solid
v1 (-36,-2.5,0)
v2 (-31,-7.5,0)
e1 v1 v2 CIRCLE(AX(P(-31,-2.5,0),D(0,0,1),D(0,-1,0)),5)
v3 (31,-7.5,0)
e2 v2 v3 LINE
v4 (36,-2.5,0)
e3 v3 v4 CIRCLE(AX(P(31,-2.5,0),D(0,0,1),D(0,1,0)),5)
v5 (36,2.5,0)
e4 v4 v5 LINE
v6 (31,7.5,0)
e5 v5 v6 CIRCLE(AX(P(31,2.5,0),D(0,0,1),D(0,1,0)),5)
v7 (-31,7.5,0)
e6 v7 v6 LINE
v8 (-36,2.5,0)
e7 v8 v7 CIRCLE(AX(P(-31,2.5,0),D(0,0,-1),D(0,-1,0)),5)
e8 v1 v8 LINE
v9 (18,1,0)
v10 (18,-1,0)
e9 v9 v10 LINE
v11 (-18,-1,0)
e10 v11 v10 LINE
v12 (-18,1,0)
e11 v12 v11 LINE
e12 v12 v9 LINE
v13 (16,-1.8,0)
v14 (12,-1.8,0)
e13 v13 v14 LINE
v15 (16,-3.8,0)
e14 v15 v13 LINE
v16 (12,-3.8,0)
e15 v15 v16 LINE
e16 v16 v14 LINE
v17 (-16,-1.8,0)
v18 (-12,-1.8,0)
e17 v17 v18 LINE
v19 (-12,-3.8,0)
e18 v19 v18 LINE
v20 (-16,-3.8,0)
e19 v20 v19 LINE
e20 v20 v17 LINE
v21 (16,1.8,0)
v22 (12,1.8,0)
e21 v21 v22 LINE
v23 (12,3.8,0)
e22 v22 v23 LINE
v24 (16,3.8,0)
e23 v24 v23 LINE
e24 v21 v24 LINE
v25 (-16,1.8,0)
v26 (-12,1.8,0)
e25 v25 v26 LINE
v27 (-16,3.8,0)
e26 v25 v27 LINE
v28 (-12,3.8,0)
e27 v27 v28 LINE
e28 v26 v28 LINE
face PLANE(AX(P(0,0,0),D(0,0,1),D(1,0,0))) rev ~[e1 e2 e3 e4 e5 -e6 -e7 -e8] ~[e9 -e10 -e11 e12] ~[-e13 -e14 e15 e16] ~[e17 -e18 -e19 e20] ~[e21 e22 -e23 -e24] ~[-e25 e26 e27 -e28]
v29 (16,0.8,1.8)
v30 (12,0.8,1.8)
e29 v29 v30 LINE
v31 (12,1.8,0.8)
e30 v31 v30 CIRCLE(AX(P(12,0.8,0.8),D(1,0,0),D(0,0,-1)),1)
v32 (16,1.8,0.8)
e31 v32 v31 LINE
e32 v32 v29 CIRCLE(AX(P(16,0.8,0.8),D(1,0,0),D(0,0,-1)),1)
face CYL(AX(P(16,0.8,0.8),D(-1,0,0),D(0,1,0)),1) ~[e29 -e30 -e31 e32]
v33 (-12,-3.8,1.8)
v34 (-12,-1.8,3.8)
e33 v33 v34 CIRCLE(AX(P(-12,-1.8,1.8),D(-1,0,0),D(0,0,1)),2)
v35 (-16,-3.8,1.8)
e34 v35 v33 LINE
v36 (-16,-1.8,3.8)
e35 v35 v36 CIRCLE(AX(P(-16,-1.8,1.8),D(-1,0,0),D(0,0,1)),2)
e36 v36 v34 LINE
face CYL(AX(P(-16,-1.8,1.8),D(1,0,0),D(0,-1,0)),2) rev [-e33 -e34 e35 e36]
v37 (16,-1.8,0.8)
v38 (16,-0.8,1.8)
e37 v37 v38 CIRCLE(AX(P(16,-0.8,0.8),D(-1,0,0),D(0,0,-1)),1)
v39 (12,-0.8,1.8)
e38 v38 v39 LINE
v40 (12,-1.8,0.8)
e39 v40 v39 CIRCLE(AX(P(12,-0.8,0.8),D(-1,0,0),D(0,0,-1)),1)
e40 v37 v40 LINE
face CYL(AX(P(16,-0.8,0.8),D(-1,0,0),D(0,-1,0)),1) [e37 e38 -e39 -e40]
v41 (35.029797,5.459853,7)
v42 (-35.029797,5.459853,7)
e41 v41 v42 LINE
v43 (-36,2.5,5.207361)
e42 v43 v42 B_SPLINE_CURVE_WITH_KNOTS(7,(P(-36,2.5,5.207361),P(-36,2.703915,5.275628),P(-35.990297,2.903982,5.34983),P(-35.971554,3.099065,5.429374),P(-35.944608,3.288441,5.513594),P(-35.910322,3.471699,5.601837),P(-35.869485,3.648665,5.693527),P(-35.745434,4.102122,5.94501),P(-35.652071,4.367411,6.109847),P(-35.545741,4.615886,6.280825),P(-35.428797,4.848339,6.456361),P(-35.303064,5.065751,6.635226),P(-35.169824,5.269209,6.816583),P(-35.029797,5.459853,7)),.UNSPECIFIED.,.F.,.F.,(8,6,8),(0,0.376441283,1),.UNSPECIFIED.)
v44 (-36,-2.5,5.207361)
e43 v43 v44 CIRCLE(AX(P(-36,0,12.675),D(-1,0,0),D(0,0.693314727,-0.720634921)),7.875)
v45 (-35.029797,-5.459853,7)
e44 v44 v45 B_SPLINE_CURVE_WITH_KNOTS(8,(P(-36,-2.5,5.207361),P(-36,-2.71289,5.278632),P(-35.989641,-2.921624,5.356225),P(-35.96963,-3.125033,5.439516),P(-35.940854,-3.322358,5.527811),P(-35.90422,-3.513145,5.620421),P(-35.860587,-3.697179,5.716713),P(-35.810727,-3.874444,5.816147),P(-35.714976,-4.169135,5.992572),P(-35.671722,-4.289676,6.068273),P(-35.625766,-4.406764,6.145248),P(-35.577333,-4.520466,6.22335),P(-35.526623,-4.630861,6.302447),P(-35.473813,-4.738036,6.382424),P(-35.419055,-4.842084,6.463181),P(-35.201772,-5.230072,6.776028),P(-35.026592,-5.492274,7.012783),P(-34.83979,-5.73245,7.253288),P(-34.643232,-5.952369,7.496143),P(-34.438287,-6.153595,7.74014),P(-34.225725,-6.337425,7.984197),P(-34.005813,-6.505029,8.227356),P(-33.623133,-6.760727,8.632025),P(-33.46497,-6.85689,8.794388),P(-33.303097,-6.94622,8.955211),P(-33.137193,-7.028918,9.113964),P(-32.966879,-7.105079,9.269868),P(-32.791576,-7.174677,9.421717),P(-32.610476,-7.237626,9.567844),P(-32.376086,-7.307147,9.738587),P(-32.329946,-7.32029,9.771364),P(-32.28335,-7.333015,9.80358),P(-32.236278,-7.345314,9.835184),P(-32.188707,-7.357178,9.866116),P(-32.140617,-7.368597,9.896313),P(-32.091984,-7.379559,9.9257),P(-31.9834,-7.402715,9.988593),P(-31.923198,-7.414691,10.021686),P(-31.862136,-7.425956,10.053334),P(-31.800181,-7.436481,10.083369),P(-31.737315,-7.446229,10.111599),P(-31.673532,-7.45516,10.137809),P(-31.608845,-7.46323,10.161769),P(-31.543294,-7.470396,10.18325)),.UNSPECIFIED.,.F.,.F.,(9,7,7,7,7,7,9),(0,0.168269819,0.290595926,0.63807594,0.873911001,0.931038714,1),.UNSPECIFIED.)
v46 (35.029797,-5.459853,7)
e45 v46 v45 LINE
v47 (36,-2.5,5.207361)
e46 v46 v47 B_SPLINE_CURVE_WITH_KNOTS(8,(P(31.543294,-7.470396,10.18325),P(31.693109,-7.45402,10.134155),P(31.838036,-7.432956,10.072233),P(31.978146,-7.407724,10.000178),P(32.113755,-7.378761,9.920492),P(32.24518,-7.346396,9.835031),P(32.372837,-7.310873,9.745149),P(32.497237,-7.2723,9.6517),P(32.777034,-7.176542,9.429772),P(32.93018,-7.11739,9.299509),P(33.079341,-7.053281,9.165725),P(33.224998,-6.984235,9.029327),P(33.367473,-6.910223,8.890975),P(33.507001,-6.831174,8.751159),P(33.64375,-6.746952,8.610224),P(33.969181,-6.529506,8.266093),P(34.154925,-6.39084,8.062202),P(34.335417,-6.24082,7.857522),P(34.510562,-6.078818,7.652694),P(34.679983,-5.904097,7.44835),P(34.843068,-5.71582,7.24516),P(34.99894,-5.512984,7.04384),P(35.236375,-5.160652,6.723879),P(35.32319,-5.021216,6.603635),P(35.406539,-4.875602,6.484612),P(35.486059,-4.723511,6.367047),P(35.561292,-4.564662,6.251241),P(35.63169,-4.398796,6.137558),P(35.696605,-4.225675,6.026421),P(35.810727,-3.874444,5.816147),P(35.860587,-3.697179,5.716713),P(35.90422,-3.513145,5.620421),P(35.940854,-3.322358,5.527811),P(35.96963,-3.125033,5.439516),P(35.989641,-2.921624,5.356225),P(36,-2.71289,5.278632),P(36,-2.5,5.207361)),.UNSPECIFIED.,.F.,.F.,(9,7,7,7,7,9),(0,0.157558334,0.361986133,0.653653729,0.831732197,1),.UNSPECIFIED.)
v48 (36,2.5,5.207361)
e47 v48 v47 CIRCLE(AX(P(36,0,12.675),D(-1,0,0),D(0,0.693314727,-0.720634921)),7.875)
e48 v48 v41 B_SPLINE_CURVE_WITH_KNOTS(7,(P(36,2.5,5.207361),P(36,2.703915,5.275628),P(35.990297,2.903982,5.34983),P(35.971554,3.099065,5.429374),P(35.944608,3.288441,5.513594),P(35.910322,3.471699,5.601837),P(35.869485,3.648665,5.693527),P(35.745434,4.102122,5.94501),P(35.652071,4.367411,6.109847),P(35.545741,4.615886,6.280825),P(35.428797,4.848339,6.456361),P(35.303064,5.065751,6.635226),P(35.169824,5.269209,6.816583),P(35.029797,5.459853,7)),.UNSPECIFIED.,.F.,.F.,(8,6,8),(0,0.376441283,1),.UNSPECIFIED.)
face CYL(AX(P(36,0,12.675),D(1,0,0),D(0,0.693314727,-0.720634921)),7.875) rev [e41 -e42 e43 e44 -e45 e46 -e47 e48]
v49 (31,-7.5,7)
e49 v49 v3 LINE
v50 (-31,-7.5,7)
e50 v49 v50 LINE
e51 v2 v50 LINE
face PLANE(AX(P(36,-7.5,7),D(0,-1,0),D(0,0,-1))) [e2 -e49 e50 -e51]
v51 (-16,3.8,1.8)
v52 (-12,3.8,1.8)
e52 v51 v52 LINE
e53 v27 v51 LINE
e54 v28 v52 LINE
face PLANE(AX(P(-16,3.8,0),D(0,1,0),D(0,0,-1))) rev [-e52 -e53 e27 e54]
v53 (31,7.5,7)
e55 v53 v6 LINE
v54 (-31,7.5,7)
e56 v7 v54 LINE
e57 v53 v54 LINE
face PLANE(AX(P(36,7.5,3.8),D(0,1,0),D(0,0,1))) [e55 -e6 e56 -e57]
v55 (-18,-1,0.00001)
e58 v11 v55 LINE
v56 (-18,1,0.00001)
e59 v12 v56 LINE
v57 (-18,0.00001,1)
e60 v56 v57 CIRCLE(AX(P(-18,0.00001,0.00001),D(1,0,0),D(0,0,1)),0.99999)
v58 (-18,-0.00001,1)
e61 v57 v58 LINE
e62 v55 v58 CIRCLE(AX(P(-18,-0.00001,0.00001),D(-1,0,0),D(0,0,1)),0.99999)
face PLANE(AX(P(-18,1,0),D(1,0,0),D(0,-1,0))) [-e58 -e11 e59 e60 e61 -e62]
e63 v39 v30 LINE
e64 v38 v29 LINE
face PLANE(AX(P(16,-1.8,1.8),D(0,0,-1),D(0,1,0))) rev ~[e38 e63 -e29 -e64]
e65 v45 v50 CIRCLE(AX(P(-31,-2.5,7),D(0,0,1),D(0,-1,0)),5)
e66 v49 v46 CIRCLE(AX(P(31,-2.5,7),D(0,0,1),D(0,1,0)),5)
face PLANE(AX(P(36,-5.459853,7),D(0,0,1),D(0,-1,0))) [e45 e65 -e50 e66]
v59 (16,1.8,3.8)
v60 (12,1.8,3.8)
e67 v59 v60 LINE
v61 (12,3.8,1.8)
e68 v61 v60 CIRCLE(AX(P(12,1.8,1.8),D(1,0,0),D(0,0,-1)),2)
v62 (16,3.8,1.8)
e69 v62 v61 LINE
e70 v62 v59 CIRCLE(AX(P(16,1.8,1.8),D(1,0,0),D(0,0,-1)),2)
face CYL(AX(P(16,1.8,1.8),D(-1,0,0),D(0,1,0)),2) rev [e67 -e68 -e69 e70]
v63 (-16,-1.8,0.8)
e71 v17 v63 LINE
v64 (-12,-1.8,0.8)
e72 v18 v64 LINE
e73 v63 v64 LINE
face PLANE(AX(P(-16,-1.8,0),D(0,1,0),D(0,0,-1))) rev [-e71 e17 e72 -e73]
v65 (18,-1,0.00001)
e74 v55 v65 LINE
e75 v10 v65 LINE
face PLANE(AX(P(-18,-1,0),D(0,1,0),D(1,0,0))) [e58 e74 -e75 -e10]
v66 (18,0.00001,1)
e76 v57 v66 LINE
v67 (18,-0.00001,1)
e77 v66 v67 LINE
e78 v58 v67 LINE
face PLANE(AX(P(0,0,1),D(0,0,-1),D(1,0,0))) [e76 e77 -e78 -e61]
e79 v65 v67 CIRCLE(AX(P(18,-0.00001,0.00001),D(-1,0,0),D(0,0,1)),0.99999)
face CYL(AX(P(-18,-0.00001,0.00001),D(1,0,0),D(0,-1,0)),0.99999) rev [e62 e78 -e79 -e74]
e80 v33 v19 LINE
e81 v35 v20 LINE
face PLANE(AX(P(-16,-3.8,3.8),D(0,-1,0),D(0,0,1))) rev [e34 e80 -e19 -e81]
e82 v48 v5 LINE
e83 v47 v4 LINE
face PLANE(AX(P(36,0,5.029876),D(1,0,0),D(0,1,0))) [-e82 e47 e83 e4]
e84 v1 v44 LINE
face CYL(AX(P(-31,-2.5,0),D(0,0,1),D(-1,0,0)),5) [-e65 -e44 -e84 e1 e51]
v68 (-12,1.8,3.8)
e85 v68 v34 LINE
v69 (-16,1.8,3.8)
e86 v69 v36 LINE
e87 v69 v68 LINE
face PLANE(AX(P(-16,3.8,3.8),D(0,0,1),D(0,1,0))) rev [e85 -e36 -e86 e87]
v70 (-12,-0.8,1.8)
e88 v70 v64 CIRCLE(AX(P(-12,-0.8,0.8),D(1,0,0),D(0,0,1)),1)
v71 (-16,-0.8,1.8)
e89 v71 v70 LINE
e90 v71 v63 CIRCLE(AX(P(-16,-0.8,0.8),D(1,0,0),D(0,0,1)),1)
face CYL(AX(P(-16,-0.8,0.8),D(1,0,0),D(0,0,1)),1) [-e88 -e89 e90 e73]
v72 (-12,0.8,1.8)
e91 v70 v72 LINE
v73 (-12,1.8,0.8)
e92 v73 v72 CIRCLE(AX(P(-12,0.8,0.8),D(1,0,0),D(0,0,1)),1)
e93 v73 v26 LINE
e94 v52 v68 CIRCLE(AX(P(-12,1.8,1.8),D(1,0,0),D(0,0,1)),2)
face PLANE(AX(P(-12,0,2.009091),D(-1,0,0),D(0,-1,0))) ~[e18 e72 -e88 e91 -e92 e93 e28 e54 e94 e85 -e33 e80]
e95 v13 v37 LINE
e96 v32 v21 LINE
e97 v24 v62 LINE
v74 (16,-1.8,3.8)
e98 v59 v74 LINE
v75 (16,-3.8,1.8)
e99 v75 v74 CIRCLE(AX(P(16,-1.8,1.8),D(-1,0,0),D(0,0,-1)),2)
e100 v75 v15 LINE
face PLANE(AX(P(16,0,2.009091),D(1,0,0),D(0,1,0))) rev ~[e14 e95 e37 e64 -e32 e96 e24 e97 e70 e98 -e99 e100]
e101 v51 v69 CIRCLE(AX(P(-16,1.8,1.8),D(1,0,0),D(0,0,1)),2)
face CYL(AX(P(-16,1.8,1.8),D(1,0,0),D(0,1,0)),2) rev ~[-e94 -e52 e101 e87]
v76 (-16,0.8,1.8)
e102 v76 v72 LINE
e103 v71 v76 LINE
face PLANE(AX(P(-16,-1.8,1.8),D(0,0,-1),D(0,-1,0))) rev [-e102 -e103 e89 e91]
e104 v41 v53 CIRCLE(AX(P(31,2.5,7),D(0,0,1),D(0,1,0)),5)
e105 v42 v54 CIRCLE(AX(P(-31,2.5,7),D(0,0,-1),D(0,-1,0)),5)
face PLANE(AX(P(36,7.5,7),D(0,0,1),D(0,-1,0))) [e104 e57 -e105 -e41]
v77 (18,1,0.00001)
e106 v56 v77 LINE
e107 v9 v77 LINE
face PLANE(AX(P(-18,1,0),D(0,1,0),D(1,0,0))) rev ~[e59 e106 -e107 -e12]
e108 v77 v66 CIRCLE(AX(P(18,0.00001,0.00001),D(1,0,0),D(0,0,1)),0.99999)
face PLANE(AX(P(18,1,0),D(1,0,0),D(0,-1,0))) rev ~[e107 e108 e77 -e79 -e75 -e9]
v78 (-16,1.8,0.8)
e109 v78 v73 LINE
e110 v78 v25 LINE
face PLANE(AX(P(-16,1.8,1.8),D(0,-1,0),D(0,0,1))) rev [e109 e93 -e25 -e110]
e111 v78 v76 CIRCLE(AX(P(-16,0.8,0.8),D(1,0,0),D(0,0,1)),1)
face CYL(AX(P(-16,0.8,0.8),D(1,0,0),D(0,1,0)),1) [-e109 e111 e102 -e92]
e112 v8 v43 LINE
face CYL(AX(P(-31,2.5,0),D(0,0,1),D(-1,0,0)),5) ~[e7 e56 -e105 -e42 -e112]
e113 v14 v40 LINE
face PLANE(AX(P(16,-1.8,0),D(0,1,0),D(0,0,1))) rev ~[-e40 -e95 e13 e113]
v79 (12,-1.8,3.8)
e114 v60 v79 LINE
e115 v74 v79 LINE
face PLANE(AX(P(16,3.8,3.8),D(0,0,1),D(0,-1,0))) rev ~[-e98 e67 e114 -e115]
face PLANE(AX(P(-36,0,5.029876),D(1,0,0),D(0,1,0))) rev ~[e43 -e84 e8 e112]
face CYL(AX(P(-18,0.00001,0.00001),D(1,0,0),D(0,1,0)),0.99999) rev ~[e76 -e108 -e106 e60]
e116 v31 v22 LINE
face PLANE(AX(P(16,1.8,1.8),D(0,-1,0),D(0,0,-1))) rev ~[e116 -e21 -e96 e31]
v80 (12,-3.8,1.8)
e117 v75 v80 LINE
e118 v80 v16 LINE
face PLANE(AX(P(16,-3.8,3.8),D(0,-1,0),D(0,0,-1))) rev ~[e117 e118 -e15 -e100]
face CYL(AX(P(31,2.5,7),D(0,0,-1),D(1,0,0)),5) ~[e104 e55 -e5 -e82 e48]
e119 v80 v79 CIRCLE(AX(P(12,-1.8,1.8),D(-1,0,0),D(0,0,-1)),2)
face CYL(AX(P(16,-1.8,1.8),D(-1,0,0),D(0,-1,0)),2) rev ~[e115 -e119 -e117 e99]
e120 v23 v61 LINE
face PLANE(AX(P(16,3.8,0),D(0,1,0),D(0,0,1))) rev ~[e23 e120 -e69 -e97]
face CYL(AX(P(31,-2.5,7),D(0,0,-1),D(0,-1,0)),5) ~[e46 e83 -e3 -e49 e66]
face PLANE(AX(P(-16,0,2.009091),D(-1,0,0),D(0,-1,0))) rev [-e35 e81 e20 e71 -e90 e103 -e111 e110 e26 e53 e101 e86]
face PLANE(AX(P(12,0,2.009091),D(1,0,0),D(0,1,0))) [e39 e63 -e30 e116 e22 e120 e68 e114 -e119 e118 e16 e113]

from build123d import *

# Parameters (mm, degrees)
F0_W      = 72
F0_H      = 15
F1_DEPTH  = 3.8
F3_DEPTH  = 72
F4_R      = 5
F5_W      = 36
F5_H      = 2
F6_DEPTH  = 1
F7_R      = 0.99999
F10_DEPTH = 4
F11_R     = 2
F12_R     = 1


# Not quite as in the source:
# - a fillet or chamfer is up to 0.001 mm smaller than in the source, because OpenCascade refuses the exact size
# - a pattern or mirror of a feature is missing from the dataset's text; its kind, count and spacing are read off the source's solid


with BuildPart() as f1:
    # F0 (on Top) → F1 (new body)
    with BuildSketch(Plane.XY):
        Rectangle(F0_W, F0_H)
    extrude(amount=F1_DEPTH)

    # F2 (on face) → F3 (join)
    with BuildSketch(Plane.YZ.offset(36)):
        with BuildLine():
            Line((7.5, 7), (5.4598534779, 7))
            ThreePointArc((5.4598534779, 7), (0, 4.8), (-5.4598534779, 7))
            Line((-5.4598534779, 7), (-7.5, 7))
            Line((-7.5, 7), (-7.5, 3.8))
            Line((-7.5, 3.8), (7.5, 3.8))
            Line((7.5, 3.8), (7.5, 7))
        make_face()
    extrude(amount=-F3_DEPTH)

    # F4
    f4_edges = [f1.edges().sort_by_distance(p)[0] for p in [
        (-36, -7.5, 3.5),
        (36, -7.5, 3.5),
        (36, 7.5, 3.5),
        (-36, 7.5, 3.5),
    ]]
    fillet(f4_edges, radius=F4_R)

    # F5 (on face) → F6 (cut)
    with BuildSketch(Plane(origin=(0, 0, 0), x_dir=(1, 0, 0), z_dir=(0, 0, -1))):
        Rectangle(F5_W, F5_H)
    extrude(amount=-F6_DEPTH, mode=Mode.SUBTRACT)

    # F7 (radius 1 in the source; OpenCascade refuses exactly that, so slightly less here)
    f7_edges = [f1.edges().sort_by_distance(p)[0] for p in [
        (0, -1, 1),
        (0, 1, 1),
    ]]
    fillet(f7_edges, radius=F7_R)

    # F9 (on offset) → F10 (cut)
    with BuildSketch(Plane.YZ.offset(16)):
        Polygon((-3.8, 0), (-1.8, 0), (-1.8, 1.8), (0, 1.8), (1.8, 1.8), (1.8, 0), (3.8, 0), (3.8, 3.8), (0, 3.8), (-3.8, 3.8), align=None)
    f10 = extrude(amount=-F10_DEPTH, mode=Mode.SUBTRACT)

    # F10_copies: F10 across plane
    add(f10.mirror(Plane(origin=(0, 0, 0), x_dir=(0, 0, -1), z_dir=(-1, 0, 0))), mode=Mode.SUBTRACT)

    # F11
    f11_edges = [f1.edges().sort_by_distance(p)[0] for p in [
        (14, -3.8, 3.8),
        (14, 3.8, 3.8),
        (-14, -3.8, 3.8),
        (-14, 3.8, 3.8),
    ]]
    fillet(f11_edges, radius=F11_R)

    # F12
    f12_edges = [f1.edges().sort_by_distance(p)[0] for p in [
        (14, -1.8, 1.8),
        (14, 1.8, 1.8),
        (-14, 1.8, 1.8),
        (-14, -1.8, 1.8),
    ]]
    fillet(f12_edges, radius=F12_R)


solid = f1.part
